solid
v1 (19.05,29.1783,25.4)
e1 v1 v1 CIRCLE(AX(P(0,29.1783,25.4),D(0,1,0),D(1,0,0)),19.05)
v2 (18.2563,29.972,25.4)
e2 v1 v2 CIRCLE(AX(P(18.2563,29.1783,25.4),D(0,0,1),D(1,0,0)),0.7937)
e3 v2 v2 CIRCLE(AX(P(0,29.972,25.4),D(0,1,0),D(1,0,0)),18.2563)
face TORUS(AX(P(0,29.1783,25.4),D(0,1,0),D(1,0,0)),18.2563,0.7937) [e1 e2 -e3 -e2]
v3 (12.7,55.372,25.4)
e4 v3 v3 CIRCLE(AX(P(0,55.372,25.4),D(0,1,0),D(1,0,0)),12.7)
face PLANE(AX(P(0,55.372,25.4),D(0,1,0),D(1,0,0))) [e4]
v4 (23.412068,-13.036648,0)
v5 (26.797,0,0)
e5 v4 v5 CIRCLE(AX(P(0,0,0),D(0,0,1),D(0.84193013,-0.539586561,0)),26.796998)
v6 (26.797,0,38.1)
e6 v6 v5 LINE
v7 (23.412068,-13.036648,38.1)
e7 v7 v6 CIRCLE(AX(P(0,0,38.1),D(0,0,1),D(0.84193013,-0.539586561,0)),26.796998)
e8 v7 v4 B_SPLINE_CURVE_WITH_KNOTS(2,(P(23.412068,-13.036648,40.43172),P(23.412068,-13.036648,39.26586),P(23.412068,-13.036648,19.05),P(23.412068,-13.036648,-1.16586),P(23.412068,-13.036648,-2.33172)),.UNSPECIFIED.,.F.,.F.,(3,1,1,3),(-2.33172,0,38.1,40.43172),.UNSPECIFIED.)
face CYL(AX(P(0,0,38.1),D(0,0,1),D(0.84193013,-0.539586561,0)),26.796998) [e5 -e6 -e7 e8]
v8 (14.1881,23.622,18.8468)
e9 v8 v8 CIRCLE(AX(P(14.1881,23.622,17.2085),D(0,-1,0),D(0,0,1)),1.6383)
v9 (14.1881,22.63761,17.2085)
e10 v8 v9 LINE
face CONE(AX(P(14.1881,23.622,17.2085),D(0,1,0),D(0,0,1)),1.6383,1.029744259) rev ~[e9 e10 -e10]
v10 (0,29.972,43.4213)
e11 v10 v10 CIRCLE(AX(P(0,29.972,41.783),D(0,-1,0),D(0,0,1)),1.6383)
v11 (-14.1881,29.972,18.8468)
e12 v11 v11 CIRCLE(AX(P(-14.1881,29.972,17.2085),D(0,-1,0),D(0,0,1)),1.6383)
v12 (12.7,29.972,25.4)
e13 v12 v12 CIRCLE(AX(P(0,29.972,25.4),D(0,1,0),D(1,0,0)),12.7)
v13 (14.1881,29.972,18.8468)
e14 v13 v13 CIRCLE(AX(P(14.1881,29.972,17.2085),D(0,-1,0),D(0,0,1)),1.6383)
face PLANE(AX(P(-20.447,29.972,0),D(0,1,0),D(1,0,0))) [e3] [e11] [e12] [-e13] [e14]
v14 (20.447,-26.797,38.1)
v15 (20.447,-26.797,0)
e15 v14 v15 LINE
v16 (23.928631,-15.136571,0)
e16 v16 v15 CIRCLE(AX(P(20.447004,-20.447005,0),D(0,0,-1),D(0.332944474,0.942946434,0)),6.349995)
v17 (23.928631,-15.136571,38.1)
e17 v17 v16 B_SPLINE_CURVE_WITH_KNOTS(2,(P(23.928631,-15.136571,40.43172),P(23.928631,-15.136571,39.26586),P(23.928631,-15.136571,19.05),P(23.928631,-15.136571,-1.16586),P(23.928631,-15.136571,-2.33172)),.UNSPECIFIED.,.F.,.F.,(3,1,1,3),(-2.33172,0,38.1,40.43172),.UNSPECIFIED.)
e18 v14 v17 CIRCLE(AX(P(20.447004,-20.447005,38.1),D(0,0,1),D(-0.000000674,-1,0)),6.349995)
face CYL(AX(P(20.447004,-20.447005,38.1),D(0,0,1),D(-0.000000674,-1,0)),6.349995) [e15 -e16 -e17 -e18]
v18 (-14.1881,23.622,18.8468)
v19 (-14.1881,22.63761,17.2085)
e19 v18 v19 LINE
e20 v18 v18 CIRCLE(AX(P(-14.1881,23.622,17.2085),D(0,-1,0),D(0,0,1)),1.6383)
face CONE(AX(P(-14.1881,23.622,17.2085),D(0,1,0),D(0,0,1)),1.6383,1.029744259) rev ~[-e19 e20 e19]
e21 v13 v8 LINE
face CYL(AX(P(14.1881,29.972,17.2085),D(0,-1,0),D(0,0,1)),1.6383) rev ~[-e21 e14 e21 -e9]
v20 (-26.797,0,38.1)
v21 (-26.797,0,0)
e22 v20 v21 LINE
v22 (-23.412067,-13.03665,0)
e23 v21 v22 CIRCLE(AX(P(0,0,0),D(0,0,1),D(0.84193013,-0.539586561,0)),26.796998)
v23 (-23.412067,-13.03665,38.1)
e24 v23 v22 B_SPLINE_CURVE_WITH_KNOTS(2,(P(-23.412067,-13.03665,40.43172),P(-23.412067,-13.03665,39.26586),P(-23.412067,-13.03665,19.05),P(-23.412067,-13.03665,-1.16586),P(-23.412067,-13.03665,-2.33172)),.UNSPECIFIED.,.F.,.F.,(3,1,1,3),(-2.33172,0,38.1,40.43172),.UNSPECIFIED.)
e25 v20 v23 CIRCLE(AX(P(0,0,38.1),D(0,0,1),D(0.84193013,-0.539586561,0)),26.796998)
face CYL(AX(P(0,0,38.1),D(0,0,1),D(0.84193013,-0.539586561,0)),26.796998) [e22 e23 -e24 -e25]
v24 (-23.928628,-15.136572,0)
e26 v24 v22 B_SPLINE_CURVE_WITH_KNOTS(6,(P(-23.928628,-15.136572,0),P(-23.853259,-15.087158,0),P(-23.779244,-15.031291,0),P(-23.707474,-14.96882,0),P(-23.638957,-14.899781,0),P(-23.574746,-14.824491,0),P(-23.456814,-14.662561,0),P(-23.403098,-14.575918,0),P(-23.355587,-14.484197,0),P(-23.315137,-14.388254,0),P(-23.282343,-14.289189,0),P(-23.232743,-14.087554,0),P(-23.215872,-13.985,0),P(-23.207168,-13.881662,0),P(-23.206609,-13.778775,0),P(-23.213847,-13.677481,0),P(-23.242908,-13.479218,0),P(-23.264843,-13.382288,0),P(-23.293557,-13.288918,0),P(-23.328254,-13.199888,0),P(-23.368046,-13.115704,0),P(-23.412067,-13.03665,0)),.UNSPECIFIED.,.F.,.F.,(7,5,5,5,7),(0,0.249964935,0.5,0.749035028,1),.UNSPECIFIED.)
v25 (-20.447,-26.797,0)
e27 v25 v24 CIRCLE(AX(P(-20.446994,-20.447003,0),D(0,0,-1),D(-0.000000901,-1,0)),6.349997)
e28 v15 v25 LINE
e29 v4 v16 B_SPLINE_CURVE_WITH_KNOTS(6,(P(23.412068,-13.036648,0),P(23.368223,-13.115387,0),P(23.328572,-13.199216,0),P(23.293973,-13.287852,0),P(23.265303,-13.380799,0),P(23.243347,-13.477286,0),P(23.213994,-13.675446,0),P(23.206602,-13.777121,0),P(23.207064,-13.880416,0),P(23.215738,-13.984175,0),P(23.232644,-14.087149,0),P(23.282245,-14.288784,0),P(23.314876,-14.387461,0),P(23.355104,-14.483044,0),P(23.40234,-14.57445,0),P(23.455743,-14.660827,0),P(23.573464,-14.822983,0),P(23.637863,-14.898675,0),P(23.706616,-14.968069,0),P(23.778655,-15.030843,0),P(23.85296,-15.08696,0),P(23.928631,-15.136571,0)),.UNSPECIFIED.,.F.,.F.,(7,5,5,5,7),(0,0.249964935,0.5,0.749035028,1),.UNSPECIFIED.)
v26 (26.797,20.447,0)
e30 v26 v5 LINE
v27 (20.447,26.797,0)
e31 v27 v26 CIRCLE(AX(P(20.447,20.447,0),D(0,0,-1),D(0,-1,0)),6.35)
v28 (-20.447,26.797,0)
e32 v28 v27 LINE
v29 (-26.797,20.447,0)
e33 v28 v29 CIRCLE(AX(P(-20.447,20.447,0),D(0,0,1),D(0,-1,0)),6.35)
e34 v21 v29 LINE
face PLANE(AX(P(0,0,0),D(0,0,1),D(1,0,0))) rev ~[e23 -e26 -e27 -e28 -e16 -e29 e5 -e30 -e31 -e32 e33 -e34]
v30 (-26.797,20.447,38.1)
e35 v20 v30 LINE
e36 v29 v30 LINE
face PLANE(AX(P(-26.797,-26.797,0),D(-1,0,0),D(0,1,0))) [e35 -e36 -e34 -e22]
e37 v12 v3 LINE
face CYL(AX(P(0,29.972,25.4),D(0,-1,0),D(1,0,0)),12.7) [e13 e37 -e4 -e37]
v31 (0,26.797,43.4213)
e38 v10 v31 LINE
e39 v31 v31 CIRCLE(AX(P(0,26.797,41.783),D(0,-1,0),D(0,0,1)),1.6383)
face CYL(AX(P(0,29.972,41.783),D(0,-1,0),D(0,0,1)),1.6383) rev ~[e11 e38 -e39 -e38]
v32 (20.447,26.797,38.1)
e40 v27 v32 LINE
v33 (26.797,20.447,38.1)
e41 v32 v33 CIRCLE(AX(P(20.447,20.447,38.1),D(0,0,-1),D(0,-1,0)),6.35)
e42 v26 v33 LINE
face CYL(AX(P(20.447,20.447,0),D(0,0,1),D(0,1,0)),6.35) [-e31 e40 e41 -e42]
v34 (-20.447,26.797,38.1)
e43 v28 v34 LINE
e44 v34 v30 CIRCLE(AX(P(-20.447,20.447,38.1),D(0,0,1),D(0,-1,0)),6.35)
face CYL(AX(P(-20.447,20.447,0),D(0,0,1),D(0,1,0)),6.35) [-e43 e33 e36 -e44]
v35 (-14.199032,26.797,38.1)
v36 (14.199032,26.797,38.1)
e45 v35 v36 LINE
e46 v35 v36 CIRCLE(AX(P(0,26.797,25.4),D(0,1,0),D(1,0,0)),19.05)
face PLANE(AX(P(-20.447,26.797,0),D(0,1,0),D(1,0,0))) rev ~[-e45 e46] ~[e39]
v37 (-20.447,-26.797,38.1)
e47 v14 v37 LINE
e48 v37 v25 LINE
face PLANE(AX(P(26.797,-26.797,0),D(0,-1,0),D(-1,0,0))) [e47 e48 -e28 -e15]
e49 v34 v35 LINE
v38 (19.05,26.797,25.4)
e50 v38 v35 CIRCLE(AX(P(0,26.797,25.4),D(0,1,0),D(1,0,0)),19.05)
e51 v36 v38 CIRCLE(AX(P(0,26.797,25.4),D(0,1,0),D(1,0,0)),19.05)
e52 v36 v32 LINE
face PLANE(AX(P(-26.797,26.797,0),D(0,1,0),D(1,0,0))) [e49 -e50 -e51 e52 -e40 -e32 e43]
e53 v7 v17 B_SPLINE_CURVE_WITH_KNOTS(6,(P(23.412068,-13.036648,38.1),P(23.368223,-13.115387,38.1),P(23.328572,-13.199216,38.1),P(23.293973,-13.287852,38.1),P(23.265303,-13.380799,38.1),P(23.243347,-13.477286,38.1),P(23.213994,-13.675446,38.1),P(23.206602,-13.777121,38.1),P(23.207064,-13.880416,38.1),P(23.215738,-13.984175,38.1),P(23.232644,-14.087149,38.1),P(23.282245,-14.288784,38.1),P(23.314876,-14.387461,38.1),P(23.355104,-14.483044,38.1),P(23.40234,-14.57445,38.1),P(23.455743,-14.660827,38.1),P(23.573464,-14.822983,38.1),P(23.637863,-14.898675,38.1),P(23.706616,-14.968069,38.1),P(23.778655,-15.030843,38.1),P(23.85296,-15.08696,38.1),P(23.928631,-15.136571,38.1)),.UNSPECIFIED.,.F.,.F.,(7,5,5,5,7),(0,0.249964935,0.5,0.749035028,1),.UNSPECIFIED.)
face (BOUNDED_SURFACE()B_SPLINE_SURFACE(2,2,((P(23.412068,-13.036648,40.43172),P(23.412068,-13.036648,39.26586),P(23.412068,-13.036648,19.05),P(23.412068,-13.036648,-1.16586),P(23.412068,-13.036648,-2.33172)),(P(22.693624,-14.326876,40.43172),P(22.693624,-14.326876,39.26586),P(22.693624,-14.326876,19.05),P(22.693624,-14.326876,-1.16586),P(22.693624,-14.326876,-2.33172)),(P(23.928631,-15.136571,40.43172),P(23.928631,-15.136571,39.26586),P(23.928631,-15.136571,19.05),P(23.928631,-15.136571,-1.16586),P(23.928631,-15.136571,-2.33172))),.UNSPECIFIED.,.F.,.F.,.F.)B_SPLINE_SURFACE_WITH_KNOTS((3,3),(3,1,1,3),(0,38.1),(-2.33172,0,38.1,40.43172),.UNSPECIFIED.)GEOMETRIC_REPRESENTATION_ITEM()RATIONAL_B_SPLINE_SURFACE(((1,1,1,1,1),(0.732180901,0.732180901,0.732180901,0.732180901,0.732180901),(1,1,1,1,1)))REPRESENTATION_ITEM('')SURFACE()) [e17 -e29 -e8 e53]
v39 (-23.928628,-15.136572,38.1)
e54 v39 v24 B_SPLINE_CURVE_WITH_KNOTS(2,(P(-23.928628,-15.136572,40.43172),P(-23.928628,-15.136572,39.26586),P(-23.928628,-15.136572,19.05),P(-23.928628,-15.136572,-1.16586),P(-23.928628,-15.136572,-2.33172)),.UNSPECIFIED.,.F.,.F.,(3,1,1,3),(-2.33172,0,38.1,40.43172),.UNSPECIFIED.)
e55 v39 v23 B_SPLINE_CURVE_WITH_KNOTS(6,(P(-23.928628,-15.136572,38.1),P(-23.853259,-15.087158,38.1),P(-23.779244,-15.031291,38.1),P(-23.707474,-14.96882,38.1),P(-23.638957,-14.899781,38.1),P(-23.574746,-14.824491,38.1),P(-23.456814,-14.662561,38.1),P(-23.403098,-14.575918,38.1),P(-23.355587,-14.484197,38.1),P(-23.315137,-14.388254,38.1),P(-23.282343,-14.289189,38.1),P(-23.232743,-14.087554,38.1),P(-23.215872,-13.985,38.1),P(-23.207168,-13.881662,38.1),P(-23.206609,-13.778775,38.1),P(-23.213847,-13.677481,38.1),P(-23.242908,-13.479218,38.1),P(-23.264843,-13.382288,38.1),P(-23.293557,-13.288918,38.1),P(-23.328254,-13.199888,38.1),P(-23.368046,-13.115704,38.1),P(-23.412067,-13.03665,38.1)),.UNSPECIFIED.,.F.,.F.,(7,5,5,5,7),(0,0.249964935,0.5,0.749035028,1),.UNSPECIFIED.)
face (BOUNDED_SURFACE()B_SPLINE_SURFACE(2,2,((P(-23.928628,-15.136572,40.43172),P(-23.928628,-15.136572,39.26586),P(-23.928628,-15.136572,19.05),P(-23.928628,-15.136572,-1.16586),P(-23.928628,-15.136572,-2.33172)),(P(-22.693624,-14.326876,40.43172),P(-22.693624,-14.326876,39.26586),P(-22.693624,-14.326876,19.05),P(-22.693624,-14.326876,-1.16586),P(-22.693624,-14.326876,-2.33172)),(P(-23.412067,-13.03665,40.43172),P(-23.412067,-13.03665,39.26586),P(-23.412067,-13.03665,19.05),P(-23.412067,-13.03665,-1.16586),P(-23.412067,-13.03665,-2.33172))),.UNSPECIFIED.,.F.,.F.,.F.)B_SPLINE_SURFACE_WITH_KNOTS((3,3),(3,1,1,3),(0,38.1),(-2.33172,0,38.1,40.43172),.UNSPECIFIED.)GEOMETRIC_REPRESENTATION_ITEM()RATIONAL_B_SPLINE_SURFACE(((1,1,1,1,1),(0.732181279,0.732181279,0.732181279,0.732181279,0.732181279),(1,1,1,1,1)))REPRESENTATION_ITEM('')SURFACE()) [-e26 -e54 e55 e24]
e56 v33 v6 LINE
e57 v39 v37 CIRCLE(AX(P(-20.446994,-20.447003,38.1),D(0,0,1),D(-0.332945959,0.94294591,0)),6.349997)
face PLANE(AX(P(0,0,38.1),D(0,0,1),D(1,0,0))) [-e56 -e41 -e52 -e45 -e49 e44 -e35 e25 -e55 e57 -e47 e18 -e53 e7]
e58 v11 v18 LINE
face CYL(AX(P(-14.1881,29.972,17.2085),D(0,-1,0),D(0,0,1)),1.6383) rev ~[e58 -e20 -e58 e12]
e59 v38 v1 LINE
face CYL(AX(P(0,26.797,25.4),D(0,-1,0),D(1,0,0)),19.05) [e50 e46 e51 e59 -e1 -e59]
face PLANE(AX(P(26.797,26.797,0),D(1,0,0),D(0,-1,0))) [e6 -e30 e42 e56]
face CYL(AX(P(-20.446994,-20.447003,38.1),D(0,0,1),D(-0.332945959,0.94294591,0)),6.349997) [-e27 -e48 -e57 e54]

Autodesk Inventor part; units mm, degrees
ref_plane "XZ Plane" through (0, 0, 0) normal (0, 1, 0) x (-1, 0, 0)
ref_plane "XY Plane" through (0, 0, 0) normal (0, 0, 1) x (1, 0, 0)
sketch "Sketch1" plane through (0, 0, 0) normal (0, 0, 1) x (1, 0, 0)
  line L0 (-26.797, 26.797) -> (26.797, 26.797)
  line L1 (26.797, 26.797) -> (26.797, -26.797)
  line L2 (26.797, -26.797) -> (-26.797, -26.797)
  line L3 (-26.797, -26.797) -> (-26.797, 26.797)
  point P0 (0, 0)
  point P1 (-26.797, 0)
  point P2 (0, 26.797)
  dimension "d0" = 53.594
  dimension "d1" = 53.594
extrude "Extrusion1" add sketch "Sketch1" along normal blind 38.1
fillet "Fillet1" radius 6.35 2 edges at (-26.797, 26.797, 19.05) (26.797, 26.797, 19.05)
sketch "Sketch3" plane through (0, 0, 38.1) normal (0, 0, 1) x (1, 0, 0)
  arc A0 (26.797, 20.447) -> (20.447, 26.797) centre (20.447, 20.447) ccw projected
  line L0 (-20.447, 26.797) -> (20.447, 26.797) projected
  arc A1 (-20.447, 26.797) -> (-26.797, 20.447) centre (-20.447, 20.447) ccw projected
  line L1 (-26.797, -26.797) -> (-26.797, 20.447) projected
  line L2 (26.797, -26.797) -> (-26.797, -26.797) projected
  line L3 (26.797, 20.447) -> (26.797, -26.797) projected
  arc A2 (-22.5612, -14.4593) -> (-20.447, -26.797) centre (-20.447, -20.447) ccw
  arc A3 (20.447, -26.797) -> (22.5612, -14.4593) centre (20.447, -20.447) ccw
  line L4 (-26.797, -26.797) -> (26.797, -26.797)
  line L5 (-26.797, 0) -> (-26.797, -26.797)
  line L6 (26.797, 0) -> (26.797, -26.797)
  arc A4 (22.5612, -14.4593) -> (-22.5612, -14.4593) centre (0, 0) ccw
  line L7 (-26.797, 0) -> (-26.797, 20.447)
  line L8 (-20.447, 26.797) -> (20.447, 26.797)
  line L9 (26.797, 20.447) -> (26.797, 0)
  arc A5 (-20.447, 26.797) -> (-26.797, 20.447) centre (-20.447, 20.447) ccw
  arc A6 (26.797, 20.447) -> (20.447, 26.797) centre (20.447, 20.447) ccw
  dimension "d9" = 12.7
  dimension "d10" = 12.7
  dimension "d12" = 26.797
extrude "Extrusion2" cut sketch "Sketch3" against normal through all contours L3 A3 A4 | L3 L2 A3 | A4 A2 L1 | A2 L2 L1
fillet "Fillet2" radius 1.5875 2 edges at (22.5612, -14.4593, 19.05) (-22.5612, -14.4593, 19.05)
sketch "Sketch4" plane through (-20.447, 26.797, 0) normal (0, 1, 0) x (1, 0, 0)
  line L0 (0, 0) -> (40.894, 0) projected
  line L1 (-6.35, -38.1) -> (0, -38.1) projected
  line L2 (0, -38.1) -> (0, 0) projected
  line L3 (0, 0) -> (-6.35, 0) projected
  line L4 (-6.35, 0) -> (-6.35, -38.1) projected
  line L5 (43.8591, 0) -> (43.8591, -38.1) projected
  line L6 (40.894, -38.1) -> (47.244, -38.1) projected
  line L7 (47.244, -38.1) -> (47.244, 0) projected
  line L8 (47.244, 0) -> (40.894, 0) projected
  line L9 (40.894, 0) -> (40.894, -38.1) projected
  line L10 (-2.9651, -38.1) -> (-2.9651, 0) projected
  circle A0 centre (20.447, -25.4) radius 19.05
  point P0 (20.447, 0)
  point P1 (20.447, -6.35)
  point P2 (20.447, 0)
  dimension "d16" = 38.1
  dimension "d17" = 6.35
extrude "Extrusion3" add sketch "Sketch4" along normal blind 3.175 contours A0
fillet "Fillet3" radius 0.7937 1 edges at (-19.05, 29.972, 25.4)
sketch "Sketch5" plane through (0, 29.972, 25.4) normal (0, 1, 0) x (1, 0, 0)
  circle A0 centre (0, 0) radius 18.2562 projected
  circle A1 centre (0, 0) radius 12.7
  circle A2 centre (0, 0) radius 19.05 projected
  point P0 (0, 25.4)
  dimension "d24" = 6.35
extrude "Extrusion4" add sketch "Sketch5" along normal blind 25.4 contours A1
sketch "Sketch6" plane through (0, 29.972, 25.4) normal (0, 1, 0) x (1, 0, 0)
  circle A0 centre (-14.1881, 8.1915) radius 1.6383 projected
  circle A1 centre (0, -16.383) radius 1.6383 projected
  circle A2 centre (14.1881, 8.1915) radius 1.6383 projected
  point P0 (0, 25.4)
hole "Hole1" at (0, 29.972, 41.783) at (14.1881, 29.972, 17.2085) at (-14.1881, 29.972, 17.2085) direction (0, -1, 0) diameter 3.2766 depth 6.35 tip angle 118 clearance for "Flat Head Machine Screw (82)" size "#4" standard "Ansi Unified Screw Threads"
properties part number "Pneumatics_VIAIR_0090_02"
